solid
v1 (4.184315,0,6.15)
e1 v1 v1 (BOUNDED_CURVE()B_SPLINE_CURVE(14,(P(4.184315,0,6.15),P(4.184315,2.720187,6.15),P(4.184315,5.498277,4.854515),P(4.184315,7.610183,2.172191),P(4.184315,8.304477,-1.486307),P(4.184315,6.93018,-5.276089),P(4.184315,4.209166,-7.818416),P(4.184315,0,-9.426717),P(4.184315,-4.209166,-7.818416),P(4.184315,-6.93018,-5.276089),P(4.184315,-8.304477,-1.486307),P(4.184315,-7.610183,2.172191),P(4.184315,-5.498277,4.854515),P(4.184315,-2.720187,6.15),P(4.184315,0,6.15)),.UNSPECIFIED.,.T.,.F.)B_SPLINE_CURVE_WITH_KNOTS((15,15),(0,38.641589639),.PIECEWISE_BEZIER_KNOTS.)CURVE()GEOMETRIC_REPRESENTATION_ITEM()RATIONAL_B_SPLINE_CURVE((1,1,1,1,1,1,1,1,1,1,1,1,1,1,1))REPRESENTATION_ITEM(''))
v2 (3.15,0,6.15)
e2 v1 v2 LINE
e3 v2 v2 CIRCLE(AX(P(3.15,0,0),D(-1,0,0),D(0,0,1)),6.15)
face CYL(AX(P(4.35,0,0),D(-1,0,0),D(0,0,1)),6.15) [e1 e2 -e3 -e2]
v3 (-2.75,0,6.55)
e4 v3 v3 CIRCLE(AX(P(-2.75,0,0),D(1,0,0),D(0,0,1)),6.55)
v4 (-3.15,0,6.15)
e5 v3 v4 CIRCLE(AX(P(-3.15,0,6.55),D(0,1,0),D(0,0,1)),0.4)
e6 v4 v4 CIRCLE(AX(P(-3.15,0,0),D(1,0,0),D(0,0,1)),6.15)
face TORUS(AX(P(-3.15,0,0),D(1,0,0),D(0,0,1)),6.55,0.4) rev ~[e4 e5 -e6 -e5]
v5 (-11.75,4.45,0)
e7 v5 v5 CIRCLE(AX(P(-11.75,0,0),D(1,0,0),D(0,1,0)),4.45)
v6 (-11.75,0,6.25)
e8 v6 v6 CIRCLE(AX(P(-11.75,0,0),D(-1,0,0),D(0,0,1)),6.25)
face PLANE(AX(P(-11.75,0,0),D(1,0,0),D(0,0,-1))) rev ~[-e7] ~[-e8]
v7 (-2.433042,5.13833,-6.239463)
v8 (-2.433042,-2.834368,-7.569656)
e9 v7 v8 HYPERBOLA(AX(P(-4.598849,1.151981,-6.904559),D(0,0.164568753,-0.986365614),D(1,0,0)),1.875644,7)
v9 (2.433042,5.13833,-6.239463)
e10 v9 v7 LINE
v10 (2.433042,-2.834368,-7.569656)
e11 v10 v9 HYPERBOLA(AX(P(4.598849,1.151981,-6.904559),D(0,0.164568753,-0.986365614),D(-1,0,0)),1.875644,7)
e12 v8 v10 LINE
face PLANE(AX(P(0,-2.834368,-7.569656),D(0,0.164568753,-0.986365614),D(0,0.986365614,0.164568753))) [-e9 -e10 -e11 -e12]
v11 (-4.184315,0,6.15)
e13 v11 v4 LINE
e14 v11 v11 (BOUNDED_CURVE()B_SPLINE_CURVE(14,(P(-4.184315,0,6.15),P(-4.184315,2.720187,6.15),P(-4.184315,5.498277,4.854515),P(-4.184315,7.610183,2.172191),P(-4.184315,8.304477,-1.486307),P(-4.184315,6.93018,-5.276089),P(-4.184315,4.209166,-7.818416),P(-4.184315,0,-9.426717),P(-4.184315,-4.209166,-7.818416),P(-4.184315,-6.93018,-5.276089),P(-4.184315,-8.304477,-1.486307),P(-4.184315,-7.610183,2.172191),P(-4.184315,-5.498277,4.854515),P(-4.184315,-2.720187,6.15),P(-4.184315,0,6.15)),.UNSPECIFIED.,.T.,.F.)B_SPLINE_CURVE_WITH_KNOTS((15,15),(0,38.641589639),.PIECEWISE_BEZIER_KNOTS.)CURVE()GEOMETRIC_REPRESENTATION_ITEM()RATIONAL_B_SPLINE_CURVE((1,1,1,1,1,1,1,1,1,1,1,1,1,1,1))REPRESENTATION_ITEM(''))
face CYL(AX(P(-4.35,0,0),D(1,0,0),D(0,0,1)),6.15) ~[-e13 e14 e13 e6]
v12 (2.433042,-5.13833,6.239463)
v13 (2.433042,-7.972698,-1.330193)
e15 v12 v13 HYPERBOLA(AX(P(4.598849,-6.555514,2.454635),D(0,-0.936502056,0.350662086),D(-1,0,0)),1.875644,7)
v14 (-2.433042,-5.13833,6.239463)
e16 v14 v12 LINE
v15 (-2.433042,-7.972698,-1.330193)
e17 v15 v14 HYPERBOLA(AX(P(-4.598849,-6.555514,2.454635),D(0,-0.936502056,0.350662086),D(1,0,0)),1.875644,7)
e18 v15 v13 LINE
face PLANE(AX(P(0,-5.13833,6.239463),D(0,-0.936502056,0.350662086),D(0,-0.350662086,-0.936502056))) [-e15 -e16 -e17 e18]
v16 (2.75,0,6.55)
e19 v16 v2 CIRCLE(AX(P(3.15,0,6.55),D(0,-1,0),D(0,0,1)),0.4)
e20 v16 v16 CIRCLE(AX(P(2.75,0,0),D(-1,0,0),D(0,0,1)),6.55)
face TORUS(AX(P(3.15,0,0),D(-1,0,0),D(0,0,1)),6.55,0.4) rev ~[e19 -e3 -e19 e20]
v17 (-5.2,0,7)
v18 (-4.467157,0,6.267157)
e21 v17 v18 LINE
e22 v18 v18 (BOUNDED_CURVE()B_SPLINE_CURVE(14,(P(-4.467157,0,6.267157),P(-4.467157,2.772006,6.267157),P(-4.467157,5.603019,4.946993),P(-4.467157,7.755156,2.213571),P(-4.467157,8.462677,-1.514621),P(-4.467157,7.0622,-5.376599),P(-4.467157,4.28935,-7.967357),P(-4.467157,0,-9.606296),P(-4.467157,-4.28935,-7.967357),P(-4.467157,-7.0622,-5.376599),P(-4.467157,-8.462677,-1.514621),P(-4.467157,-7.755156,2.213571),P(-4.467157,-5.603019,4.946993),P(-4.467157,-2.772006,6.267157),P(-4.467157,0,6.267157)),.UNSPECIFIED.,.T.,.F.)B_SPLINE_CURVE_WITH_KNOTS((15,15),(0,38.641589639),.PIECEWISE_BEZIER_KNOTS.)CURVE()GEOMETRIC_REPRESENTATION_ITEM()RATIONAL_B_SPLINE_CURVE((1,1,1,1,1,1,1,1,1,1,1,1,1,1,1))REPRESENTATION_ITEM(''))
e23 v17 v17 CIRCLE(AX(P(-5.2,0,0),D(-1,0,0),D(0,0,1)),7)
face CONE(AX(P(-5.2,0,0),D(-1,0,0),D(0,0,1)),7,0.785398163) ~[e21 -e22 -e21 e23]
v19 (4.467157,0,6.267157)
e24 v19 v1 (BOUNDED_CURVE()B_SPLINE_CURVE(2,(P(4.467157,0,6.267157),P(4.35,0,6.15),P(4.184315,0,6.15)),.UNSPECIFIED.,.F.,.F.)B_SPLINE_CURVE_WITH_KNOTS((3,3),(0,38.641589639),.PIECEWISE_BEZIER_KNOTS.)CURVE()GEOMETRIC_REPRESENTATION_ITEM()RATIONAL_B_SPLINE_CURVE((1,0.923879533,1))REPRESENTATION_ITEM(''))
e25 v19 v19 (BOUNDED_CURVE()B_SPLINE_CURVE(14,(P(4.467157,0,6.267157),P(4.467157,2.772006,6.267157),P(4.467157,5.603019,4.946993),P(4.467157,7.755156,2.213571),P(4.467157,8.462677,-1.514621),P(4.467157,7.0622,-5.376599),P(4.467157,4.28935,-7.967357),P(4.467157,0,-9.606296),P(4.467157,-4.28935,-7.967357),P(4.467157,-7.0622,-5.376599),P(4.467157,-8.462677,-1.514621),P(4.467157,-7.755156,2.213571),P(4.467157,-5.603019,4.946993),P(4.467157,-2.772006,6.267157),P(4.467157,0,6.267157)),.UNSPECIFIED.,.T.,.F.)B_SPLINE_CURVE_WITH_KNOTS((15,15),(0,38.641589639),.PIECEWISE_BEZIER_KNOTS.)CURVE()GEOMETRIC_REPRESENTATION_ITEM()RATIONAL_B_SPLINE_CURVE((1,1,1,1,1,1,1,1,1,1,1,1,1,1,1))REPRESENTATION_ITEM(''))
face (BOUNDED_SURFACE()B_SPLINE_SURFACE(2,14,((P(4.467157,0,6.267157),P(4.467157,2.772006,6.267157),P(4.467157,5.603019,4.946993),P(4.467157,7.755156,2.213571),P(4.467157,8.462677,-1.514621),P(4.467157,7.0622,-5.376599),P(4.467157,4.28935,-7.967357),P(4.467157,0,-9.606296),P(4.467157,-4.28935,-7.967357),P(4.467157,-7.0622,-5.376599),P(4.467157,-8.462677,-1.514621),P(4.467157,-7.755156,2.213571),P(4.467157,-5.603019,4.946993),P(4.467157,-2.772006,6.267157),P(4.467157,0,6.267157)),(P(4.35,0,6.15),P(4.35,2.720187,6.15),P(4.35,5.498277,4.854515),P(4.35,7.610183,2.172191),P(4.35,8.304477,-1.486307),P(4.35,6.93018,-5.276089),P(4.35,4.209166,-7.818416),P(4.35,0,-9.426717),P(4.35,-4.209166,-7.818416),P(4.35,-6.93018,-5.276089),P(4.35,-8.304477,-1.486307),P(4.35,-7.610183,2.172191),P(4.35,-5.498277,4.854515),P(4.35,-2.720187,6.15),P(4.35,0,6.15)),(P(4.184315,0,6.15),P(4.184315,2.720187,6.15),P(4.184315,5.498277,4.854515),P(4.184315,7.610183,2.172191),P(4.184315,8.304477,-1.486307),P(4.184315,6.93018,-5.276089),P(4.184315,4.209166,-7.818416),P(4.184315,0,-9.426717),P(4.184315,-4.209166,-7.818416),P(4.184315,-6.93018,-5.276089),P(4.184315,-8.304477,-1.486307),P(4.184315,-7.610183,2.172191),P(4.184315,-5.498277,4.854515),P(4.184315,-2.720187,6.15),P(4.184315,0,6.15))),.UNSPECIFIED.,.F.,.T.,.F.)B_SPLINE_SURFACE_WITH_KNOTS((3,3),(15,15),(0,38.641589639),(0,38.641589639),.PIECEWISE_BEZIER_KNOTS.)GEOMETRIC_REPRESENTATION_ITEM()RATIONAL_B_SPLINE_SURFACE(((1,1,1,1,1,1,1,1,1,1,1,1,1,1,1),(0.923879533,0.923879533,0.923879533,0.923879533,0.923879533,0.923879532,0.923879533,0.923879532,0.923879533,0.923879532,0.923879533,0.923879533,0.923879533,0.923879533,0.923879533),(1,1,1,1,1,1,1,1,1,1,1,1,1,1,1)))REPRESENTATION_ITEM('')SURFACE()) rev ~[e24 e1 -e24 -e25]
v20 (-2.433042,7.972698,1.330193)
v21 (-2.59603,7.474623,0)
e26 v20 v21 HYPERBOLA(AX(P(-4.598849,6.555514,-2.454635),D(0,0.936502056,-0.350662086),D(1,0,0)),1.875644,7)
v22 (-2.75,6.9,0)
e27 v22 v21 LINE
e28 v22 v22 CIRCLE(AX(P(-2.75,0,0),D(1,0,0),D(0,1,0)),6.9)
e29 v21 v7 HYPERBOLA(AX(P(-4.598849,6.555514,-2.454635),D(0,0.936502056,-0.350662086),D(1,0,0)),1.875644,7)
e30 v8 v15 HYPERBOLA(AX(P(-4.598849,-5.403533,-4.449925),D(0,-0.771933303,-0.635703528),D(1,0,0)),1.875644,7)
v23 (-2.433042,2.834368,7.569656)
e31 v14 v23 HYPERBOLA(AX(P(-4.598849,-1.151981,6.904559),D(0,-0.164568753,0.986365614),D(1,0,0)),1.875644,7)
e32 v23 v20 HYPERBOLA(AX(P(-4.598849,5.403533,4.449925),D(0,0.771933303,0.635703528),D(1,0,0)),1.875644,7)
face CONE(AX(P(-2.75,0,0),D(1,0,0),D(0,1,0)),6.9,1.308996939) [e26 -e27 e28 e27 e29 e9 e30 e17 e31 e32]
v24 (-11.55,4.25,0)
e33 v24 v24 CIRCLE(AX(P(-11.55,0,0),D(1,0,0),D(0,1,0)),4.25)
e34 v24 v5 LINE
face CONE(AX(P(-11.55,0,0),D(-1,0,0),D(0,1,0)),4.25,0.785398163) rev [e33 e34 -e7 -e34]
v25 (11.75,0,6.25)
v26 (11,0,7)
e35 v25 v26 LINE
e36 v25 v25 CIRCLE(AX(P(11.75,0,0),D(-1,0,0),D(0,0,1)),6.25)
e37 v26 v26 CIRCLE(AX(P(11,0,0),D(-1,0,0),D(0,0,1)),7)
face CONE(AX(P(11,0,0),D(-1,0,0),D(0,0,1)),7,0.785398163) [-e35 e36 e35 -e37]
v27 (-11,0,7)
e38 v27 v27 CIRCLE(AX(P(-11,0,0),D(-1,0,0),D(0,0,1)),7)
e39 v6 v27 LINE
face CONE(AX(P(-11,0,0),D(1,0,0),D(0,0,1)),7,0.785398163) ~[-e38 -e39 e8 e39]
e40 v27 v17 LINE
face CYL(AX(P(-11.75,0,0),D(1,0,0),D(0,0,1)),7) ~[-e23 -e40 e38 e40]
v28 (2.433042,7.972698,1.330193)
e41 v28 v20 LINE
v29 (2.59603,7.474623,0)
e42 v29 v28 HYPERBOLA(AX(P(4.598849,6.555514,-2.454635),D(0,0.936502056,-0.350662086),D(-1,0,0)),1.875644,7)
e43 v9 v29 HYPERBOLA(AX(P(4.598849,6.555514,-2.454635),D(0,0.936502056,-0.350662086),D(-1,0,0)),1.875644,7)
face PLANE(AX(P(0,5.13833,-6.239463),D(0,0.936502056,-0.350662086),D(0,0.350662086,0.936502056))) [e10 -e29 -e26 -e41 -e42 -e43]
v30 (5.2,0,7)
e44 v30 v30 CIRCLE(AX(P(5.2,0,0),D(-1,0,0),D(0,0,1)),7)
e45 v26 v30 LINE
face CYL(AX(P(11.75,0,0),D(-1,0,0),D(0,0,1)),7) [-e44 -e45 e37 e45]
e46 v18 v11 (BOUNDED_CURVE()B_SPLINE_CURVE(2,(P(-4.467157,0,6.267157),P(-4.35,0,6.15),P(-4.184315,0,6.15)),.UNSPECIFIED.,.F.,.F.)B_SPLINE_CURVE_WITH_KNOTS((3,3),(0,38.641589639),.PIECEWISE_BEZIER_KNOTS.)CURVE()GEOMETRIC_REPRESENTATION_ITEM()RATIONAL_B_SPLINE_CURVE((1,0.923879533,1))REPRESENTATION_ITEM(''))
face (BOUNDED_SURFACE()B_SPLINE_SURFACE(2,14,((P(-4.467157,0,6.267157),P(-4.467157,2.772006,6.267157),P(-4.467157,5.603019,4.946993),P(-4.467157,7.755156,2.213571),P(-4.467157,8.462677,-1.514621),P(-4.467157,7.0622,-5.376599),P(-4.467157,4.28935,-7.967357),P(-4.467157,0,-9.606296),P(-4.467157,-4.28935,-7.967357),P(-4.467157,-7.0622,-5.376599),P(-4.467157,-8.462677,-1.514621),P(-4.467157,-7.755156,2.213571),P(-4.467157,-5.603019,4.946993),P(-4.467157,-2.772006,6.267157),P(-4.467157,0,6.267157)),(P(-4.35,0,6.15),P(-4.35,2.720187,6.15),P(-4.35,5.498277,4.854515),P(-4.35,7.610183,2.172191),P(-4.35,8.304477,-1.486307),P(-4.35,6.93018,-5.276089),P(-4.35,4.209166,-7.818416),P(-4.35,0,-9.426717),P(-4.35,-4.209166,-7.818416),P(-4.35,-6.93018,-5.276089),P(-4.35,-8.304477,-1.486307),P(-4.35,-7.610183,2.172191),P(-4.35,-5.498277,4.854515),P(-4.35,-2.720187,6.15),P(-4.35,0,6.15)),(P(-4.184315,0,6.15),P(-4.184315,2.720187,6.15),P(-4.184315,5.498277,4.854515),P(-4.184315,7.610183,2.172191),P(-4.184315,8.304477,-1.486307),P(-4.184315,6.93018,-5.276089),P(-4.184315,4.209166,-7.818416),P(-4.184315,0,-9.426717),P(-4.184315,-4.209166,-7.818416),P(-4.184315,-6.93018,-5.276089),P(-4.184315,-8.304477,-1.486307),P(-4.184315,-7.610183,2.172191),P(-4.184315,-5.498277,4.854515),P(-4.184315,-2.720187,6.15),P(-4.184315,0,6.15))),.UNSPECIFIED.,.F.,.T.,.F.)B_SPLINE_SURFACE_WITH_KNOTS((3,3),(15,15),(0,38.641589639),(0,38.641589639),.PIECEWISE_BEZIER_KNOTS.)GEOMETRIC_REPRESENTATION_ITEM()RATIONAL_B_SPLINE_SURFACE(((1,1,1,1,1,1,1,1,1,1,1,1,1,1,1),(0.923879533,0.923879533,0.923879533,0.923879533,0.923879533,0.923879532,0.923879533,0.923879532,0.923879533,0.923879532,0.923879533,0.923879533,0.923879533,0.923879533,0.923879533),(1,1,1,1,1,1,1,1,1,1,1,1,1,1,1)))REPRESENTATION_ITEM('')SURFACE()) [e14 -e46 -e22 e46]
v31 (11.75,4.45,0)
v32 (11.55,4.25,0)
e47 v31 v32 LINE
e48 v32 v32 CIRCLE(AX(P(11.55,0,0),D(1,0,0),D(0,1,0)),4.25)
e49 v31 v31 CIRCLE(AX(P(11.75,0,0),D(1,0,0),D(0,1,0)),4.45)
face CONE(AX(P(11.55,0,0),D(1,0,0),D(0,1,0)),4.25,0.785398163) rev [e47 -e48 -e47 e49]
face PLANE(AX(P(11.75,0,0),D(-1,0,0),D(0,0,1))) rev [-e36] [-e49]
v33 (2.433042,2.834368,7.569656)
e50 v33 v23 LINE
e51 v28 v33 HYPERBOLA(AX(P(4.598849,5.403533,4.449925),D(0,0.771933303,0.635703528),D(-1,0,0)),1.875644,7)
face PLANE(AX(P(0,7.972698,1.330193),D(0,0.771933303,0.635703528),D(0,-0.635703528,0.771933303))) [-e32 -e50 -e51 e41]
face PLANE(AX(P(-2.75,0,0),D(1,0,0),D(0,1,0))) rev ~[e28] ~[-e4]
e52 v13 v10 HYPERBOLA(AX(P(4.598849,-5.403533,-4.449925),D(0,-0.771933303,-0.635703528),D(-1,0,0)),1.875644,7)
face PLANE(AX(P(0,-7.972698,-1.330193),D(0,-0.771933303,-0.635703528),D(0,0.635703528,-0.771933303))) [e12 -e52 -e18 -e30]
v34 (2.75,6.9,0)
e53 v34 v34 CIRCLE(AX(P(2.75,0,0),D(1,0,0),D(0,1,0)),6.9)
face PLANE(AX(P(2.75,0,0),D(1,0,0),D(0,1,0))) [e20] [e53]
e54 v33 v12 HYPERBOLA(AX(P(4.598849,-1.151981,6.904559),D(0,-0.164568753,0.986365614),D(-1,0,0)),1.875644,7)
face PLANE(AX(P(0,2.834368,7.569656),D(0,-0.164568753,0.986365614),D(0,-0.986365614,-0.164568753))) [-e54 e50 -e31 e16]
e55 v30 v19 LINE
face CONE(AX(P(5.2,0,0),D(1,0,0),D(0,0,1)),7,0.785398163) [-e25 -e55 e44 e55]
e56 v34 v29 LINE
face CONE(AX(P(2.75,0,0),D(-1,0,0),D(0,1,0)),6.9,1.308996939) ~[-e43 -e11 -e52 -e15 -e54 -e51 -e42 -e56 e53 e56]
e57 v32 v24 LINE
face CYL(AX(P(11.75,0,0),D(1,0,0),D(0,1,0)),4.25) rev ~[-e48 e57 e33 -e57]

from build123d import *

# Parameters (mm, degrees)
F2_SIZE2       = 0.75
F2_SIZE        = 0.75
F3_R           = 0.4
F7_DEPTH       = 2.75
F7_DEPTH_BACK  = 2.75
F8_R           = 0.4
F13_R          = 4.25
F14_DEPTH      = 25
F14_DEPTH_BACK = 44
F15_SIZE2      = 0.2
F15_SIZE       = 0.2


# Not quite as in the source:
# - an extrude ends at something that could not be found from the text; its depth is read off the source's solid


with BuildPart() as f1:
    # F0 (on Front) → F1 (revolve)
    with BuildSketch(Plane.XZ):
        Polygon((0, 6.15), (0, 0), (11.75, 0), (11.75, 7), (5.2, 7), (4.35, 6.15), (2.75, 6.15), align=None)
    revolve(axis=Axis((5.875, 0, 0), (-1, 0, 0)))

    # F2
    f2_edges = [f1.edges().sort_by_distance(p)[0] for p in [
        (11.75, 0, -7),
    ]]
    chamfer(f2_edges, length=F2_SIZE, length2=F2_SIZE2)

    # F3
    f3_edges = [f1.edges().sort_by_distance(p)[0] for p in [
        (4.35, 0, -6.15),
    ]]
    fillet(f3_edges, radius=F3_R)

    # F4: F1 across plane


with BuildPart() as f1_1:
    add(f1.part)
    add(f1.part.mirror(Plane.XZ))

    # F5: F1 across plane


with BuildPart() as f1_2:
    add(f1_1.part)
    add(f1_1.part.mirror(Plane.YZ))

    # F6 (on Right) → F7 (join, two sides)
    with BuildSketch(Plane.YZ) as f7_sk:
        Polygon((2.834367898, 7.5696559996), (-5.1383304446, 6.2394626031), (-7.9726983425, -1.3301933965), (-2.834367898, -7.5696559996), (5.1383304446, -6.2394626031), (7.9726983425, 1.3301933965), align=None)
    extrude(amount=F7_DEPTH)
    extrude(f7_sk.sketch, amount=-F7_DEPTH_BACK)

    # F8
    f8_edges = [f1_2.edges().sort_by_distance(p)[0] for p in [
        (-2.75, 0, -6.15),
        (2.75, 0, -6.15),
    ]]
    fillet(f8_edges, radius=F8_R)


with BuildPart() as f10:
    # F9 (on Top) → F10 (revolve)
    with BuildSketch(Plane.XY):
        Polygon((-5.5153914727, 9.7084684995), (-2.75, 6.9), (-1.9974731336, 9.7084684995), align=None)
    revolve(axis=Axis((-5.9099821374, 0, 0), (1, 0, 0)))


with BuildPart() as f11_1:
    # F11: instance of F10
    add(f10.part.mirror(Plane.YZ))


with BuildPart() as f1_3:
    add(f1_2.part)

    # F12: cut F10, F11_1
    add(f10.part, mode=Mode.SUBTRACT)
    add(f11_1.part, mode=Mode.SUBTRACT)

    # F13 (on face) → F14 (cut, two sides)
    with BuildSketch(Plane.YZ.offset(11.75)) as f14_sk:
        Circle(F13_R)
    extrude(amount=-F14_DEPTH, mode=Mode.SUBTRACT)
    extrude(f14_sk.sketch, amount=F14_DEPTH_BACK, mode=Mode.SUBTRACT)

    # F15
    f15_edges = [f1_3.edges().sort_by_distance(p)[0] for p in [
        (11.75, -4.25, 0),
        (-11.75, -4.25, 0),
    ]]
    chamfer(f15_edges, length=F15_SIZE, length2=F15_SIZE2)


solid = f1_3.part
